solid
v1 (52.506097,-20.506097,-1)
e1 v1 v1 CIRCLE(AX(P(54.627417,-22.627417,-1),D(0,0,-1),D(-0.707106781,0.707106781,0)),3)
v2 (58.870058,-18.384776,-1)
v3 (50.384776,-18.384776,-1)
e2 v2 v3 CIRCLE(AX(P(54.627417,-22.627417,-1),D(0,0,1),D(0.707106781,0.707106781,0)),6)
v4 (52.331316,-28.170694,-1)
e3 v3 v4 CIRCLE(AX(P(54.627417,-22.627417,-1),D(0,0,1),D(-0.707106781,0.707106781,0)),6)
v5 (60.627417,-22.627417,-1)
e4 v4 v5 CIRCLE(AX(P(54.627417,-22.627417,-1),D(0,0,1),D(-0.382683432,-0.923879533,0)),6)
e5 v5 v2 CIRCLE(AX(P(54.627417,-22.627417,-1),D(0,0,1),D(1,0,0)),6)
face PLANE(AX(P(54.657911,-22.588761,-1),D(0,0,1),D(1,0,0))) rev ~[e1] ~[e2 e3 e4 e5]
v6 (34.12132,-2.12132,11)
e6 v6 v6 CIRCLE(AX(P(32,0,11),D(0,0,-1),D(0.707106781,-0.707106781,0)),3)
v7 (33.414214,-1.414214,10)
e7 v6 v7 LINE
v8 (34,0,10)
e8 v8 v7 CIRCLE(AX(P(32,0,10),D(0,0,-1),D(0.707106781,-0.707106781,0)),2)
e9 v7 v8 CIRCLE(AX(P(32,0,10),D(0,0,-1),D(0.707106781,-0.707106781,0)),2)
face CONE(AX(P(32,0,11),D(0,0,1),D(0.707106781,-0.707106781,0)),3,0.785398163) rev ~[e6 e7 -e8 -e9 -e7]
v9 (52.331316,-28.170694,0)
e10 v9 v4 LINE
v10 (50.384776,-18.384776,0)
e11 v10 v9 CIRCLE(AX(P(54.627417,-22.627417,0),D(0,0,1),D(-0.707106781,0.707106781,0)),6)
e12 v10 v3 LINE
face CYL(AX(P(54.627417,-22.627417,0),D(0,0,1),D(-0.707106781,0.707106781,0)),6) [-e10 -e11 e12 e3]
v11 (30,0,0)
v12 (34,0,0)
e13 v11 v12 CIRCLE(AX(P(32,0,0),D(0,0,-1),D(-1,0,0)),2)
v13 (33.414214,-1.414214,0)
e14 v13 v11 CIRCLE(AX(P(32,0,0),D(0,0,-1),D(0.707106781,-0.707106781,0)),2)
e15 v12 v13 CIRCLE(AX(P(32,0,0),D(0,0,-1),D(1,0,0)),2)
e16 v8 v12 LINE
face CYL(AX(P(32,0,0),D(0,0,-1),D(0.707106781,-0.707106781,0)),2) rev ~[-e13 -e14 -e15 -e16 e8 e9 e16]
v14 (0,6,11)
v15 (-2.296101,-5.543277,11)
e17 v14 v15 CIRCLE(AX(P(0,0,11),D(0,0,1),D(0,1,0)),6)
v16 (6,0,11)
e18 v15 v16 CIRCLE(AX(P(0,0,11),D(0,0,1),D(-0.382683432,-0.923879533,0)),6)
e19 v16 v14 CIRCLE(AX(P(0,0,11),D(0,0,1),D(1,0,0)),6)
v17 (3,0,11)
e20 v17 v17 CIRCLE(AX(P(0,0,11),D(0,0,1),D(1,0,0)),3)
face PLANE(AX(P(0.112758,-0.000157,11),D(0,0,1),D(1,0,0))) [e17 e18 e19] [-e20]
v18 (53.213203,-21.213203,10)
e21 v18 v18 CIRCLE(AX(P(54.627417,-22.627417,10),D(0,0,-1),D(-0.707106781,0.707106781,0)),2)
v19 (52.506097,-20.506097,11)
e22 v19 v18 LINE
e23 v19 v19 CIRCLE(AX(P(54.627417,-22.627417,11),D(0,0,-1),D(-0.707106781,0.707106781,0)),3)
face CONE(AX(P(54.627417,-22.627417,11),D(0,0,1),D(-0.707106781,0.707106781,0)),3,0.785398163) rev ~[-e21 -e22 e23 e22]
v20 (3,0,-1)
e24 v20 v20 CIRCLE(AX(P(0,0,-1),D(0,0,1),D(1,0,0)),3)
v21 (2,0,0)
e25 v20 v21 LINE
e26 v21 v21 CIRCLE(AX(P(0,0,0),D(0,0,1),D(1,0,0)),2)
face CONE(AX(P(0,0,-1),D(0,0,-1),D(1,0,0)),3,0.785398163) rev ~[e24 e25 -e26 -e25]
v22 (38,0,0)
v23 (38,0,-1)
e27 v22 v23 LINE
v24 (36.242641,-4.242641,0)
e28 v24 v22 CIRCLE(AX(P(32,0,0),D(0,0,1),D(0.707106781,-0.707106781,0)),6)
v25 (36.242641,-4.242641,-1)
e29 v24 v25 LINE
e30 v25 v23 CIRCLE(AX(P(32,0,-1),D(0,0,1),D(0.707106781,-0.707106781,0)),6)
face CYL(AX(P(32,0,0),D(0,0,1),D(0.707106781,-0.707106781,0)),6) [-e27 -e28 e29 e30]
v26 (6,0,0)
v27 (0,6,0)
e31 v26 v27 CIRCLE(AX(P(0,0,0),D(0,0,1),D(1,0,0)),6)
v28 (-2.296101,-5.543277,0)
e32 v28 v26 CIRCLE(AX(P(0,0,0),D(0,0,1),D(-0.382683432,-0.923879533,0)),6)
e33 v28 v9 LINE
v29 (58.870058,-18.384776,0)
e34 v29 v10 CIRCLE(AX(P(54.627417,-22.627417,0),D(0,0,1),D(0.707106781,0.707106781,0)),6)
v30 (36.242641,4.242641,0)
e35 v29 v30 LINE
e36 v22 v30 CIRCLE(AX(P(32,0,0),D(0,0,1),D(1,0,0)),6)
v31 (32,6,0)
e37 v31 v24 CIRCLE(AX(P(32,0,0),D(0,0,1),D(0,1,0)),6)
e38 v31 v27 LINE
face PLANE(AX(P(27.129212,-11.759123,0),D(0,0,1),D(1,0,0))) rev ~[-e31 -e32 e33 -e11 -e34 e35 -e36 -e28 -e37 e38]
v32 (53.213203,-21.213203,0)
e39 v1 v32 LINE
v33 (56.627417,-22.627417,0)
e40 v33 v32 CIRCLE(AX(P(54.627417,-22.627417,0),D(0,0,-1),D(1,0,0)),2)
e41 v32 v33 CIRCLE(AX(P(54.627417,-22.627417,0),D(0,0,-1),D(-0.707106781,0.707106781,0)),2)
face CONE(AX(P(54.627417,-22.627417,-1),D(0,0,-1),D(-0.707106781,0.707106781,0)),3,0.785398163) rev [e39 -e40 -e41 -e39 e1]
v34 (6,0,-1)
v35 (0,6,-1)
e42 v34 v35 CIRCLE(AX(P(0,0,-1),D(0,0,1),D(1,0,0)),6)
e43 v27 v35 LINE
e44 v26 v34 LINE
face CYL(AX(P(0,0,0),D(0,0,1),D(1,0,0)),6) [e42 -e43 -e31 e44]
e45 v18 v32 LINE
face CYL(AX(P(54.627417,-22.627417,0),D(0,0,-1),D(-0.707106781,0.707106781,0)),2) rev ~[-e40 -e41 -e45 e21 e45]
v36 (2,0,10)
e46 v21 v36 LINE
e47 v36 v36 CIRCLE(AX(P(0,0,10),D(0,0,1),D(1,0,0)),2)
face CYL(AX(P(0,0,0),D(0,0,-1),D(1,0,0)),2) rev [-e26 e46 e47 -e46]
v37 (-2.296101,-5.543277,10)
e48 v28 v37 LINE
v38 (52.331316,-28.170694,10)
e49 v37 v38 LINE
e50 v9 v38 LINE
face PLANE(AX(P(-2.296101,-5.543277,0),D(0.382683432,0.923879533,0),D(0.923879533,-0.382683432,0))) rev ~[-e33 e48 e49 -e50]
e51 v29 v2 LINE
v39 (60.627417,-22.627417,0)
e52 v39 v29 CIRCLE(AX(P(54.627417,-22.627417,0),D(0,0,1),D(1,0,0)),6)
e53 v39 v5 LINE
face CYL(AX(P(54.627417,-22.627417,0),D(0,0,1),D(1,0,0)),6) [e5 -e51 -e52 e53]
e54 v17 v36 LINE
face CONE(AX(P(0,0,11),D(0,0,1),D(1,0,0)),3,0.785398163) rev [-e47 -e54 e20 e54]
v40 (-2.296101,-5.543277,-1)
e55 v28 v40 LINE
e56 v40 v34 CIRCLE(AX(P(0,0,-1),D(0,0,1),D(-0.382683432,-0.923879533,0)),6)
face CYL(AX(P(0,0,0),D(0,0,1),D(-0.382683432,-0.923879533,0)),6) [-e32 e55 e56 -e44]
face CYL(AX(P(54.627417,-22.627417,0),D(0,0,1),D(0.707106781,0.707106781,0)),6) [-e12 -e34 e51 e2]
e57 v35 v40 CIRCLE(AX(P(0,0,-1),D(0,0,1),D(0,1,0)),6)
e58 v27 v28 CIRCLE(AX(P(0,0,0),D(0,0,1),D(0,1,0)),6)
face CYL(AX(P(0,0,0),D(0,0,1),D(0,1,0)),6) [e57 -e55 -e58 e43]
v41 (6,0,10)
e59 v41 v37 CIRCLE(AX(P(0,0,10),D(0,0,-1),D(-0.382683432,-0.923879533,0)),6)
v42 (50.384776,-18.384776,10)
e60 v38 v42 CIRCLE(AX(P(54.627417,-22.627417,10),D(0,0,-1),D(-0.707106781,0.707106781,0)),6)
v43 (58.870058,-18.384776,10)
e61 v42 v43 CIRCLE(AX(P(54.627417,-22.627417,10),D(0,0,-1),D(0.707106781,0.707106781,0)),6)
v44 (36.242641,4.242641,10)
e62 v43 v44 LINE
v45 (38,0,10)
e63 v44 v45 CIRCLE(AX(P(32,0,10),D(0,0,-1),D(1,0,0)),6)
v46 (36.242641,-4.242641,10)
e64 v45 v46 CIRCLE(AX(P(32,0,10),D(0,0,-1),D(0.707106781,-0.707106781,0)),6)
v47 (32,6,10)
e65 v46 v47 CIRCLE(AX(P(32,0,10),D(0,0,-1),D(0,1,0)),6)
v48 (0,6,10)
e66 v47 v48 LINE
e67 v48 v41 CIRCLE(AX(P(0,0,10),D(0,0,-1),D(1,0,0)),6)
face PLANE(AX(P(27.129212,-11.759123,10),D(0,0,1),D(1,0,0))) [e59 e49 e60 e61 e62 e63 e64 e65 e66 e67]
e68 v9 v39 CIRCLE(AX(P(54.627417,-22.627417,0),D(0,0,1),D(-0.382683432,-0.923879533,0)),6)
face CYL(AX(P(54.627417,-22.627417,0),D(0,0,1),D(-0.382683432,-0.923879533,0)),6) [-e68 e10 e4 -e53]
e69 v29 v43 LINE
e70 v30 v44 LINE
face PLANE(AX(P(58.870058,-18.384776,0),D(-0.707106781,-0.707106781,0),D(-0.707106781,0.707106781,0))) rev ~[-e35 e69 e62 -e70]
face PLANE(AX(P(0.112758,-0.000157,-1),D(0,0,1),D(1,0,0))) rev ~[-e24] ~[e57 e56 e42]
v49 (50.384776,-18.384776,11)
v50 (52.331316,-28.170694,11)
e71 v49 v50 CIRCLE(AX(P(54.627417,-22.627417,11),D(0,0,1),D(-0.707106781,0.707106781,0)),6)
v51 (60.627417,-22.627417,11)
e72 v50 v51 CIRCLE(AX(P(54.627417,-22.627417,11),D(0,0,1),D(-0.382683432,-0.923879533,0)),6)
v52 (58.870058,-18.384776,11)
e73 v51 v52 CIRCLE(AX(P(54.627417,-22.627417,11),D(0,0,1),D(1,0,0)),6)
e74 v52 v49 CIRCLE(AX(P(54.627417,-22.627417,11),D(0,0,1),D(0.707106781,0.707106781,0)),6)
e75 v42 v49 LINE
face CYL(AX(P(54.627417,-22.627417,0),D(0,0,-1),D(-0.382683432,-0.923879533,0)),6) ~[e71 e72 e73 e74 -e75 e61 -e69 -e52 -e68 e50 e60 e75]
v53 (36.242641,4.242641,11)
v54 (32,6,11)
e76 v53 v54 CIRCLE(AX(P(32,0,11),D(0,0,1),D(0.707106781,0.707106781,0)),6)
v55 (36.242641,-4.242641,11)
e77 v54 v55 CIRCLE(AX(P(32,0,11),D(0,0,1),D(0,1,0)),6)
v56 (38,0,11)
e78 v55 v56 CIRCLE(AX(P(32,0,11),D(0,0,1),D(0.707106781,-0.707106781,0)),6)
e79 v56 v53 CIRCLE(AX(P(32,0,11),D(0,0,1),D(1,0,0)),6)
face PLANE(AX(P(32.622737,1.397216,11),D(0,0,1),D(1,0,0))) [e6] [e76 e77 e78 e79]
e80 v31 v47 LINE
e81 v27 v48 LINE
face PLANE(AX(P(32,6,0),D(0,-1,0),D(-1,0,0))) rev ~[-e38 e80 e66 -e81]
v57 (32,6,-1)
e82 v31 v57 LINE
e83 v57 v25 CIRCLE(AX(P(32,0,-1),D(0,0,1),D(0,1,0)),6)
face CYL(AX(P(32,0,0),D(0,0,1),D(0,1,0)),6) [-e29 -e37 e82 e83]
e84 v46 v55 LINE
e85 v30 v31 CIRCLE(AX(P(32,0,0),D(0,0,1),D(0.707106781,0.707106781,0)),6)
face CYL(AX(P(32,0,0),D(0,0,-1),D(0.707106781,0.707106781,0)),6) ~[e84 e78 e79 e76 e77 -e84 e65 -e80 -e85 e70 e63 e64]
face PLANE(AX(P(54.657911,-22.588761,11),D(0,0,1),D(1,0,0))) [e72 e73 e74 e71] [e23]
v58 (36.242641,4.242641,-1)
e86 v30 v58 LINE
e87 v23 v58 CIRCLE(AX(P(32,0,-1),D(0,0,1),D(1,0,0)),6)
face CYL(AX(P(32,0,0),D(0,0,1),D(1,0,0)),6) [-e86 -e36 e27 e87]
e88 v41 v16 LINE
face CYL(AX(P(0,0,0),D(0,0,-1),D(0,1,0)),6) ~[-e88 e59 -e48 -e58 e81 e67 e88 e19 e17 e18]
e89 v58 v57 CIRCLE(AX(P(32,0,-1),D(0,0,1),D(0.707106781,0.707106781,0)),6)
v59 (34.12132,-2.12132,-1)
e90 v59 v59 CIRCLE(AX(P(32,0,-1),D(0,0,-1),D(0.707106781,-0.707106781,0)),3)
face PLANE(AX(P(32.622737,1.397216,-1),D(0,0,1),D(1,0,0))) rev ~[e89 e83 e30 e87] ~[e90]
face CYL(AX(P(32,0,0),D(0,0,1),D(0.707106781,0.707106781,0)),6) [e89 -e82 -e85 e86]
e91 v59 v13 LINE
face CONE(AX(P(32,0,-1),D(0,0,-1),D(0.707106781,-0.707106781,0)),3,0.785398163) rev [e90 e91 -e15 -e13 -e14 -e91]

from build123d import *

# Parameters (mm, degrees)
F0_R     = 2
F1_DEPTH = 10
F2_DEPTH = 11
F3_DEPTH = 1


# Not quite as in the source:
# - a fillet or chamfer that OpenCascade refuses, or shapes differently, is made with other operations: its cross-section is extruded or revolved along the edge and cut away or added
# - after a boolean that leaves OpenCascade's solid faulty, fix() repairs it


with BuildPart() as f1:
    # F0 (on Top) → F1 (new body)
    with BuildSketch(Plane.XY):
        with BuildLine():
            Line((26, 0), (6, 0))
            ThreePointArc((6, 0), (3.3334213981, -4.9888176738), (-2.2961005942, -5.5432771951))
            Line((-2.2961005942, -5.5432771951), (52.3313164038, -28.170694193))
            ThreePointArc((52.3313164038, -28.170694193), (48.7427053156, -23.7979589301), (50.3847763109, -18.3847763109))
            Line((50.3847763109, -18.3847763109), (36.2426406871, -4.2426406871))
            ThreePointArc((36.2426406871, -4.2426406871), (29.7038994058, -5.5432771951), (26, 0))
        make_face()
        with BuildLine():
            ThreePointArc((0, 6), (4.2426406871, 4.2426406871), (6, 0))
            Line((6, 0), (26, 0))
            ThreePointArc((26, 0), (27.7573593129, 4.2426406871), (32, 6))
            Line((32, 6), (0, 6))
        make_face()
        with BuildLine():
            ThreePointArc((38, 0), (37.5432771951, -2.2961005942), (36.2426406871, -4.2426406871))
            Line((36.2426406871, -4.2426406871), (50.3847763109, -18.3847763109))
            ThreePointArc((50.3847763109, -18.3847763109), (54.627416998, -16.627416998), (58.8700576851, -18.3847763109))
            Line((58.8700576851, -18.3847763109), (36.2426406871, 4.2426406871))
            ThreePointArc((36.2426406871, 4.2426406871), (37.5432771951, 2.2961005942), (38, 0))
        make_face()
        with BuildLine():
            ThreePointArc((-2.2961005942, -5.5432771951), (3.3334213981, -4.9888176738), (6, 0))
            ThreePointArc((6, 0), (4.2426406871, 4.2426406871), (0, 6))
            ThreePointArc((0, 6), (-5.8847116824, 1.1705419321), (-2.2961005942, -5.5432771951))
        make_face()
        Circle(F0_R, mode=Mode.SUBTRACT)
        with BuildLine():
            Line((30, 0), (26, 0))
            ThreePointArc((26, 0), (29.7038994058, -5.5432771951), (36.2426406871, -4.2426406871))
            Line((36.2426406871, -4.2426406871), (33.4142135624, -1.4142135624))
            ThreePointArc((33.4142135624, -1.4142135624), (31.2346331353, -1.847759065), (30, 0))
        make_face()
        with BuildLine():
            ThreePointArc((32, 6), (27.7573593129, 4.2426406871), (26, 0))
            Line((26, 0), (30, 0))
            ThreePointArc((30, 0), (32, 2), (34, 0))
            ThreePointArc((34, 0), (33.847759065, -0.7653668647), (33.4142135624, -1.4142135624))
            Line((33.4142135624, -1.4142135624), (36.2426406871, -4.2426406871))
            ThreePointArc((36.2426406871, -4.2426406871), (37.5432771951, -2.2961005942), (38, 0))
            ThreePointArc((38, 0), (37.5432771951, 2.2961005942), (36.2426406871, 4.2426406871))
            ThreePointArc((36.2426406871, 4.2426406871), (34.2961005942, 5.5432771951), (32, 6))
        make_face()
        with BuildLine():
            ThreePointArc((50.3847763109, -18.3847763109), (48.7427053156, -23.7979589301), (52.3313164038, -28.170694193))
            ThreePointArc((52.3313164038, -28.170694193), (57.9608383961, -27.6162346718), (60.627416998, -22.627416998))
            ThreePointArc((60.627416998, -22.627416998), (60.170694193, -20.3313164038), (58.8700576851, -18.3847763109))
            ThreePointArc((58.8700576851, -18.3847763109), (54.627416998, -16.627416998), (50.3847763109, -18.3847763109))
        make_face()
        with BuildLine():
            ThreePointArc((56.627416998, -22.627416998), (53.8620501332, -24.475176063), (53.2132034356, -21.2132034356))
            ThreePointArc((53.2132034356, -21.2132034356), (55.3927838627, -20.7796579329), (56.627416998, -22.627416998))
        make_face(mode=Mode.SUBTRACT)
    extrude(amount=F1_DEPTH)

    # F0 (on Top) → F2 (join)
    with BuildSketch(Plane.XY):
        with BuildLine():
            ThreePointArc((-2.2961005942, -5.5432771951), (3.3334213981, -4.9888176738), (6, 0))
            ThreePointArc((6, 0), (4.2426406871, 4.2426406871), (0, 6))
            ThreePointArc((0, 6), (-5.8847116824, 1.1705419321), (-2.2961005942, -5.5432771951))
        make_face()
        Circle(F0_R, mode=Mode.SUBTRACT)
        with BuildLine():
            ThreePointArc((32, 6), (27.7573593129, 4.2426406871), (26, 0))
            Line((26, 0), (30, 0))
            ThreePointArc((30, 0), (32, 2), (34, 0))
            ThreePointArc((34, 0), (33.847759065, -0.7653668647), (33.4142135624, -1.4142135624))
            Line((33.4142135624, -1.4142135624), (36.2426406871, -4.2426406871))
            ThreePointArc((36.2426406871, -4.2426406871), (37.5432771951, -2.2961005942), (38, 0))
            ThreePointArc((38, 0), (37.5432771951, 2.2961005942), (36.2426406871, 4.2426406871))
            ThreePointArc((36.2426406871, 4.2426406871), (34.2961005942, 5.5432771951), (32, 6))
        make_face()
        with BuildLine():
            Line((30, 0), (26, 0))
            ThreePointArc((26, 0), (29.7038994058, -5.5432771951), (36.2426406871, -4.2426406871))
            Line((36.2426406871, -4.2426406871), (33.4142135624, -1.4142135624))
            ThreePointArc((33.4142135624, -1.4142135624), (31.2346331353, -1.847759065), (30, 0))
        make_face()
        with BuildLine():
            ThreePointArc((50.3847763109, -18.3847763109), (48.7427053156, -23.7979589301), (52.3313164038, -28.170694193))
            ThreePointArc((52.3313164038, -28.170694193), (57.9608383961, -27.6162346718), (60.627416998, -22.627416998))
            ThreePointArc((60.627416998, -22.627416998), (60.170694193, -20.3313164038), (58.8700576851, -18.3847763109))
            ThreePointArc((58.8700576851, -18.3847763109), (54.627416998, -16.627416998), (50.3847763109, -18.3847763109))
        make_face()
        with BuildLine():
            ThreePointArc((56.627416998, -22.627416998), (53.8620501332, -24.475176063), (53.2132034356, -21.2132034356))
            ThreePointArc((53.2132034356, -21.2132034356), (55.3927838627, -20.7796579329), (56.627416998, -22.627416998))
        make_face(mode=Mode.SUBTRACT)
    extrude(amount=F2_DEPTH)

    # F0 (on Top) → F3 (join)
    with BuildSketch(Plane.XY):
        with BuildLine():
            ThreePointArc((-2.2961005942, -5.5432771951), (3.3334213981, -4.9888176738), (6, 0))
            ThreePointArc((6, 0), (4.2426406871, 4.2426406871), (0, 6))
            ThreePointArc((0, 6), (-5.8847116824, 1.1705419321), (-2.2961005942, -5.5432771951))
        make_face()
        Circle(F0_R, mode=Mode.SUBTRACT)
        with BuildLine():
            ThreePointArc((32, 6), (27.7573593129, 4.2426406871), (26, 0))
            Line((26, 0), (30, 0))
            ThreePointArc((30, 0), (32, 2), (34, 0))
            ThreePointArc((34, 0), (33.847759065, -0.7653668647), (33.4142135624, -1.4142135624))
            Line((33.4142135624, -1.4142135624), (36.2426406871, -4.2426406871))
            ThreePointArc((36.2426406871, -4.2426406871), (37.5432771951, -2.2961005942), (38, 0))
            ThreePointArc((38, 0), (37.5432771951, 2.2961005942), (36.2426406871, 4.2426406871))
            ThreePointArc((36.2426406871, 4.2426406871), (34.2961005942, 5.5432771951), (32, 6))
        make_face()
        with BuildLine():
            Line((30, 0), (26, 0))
            ThreePointArc((26, 0), (29.7038994058, -5.5432771951), (36.2426406871, -4.2426406871))
            Line((36.2426406871, -4.2426406871), (33.4142135624, -1.4142135624))
            ThreePointArc((33.4142135624, -1.4142135624), (31.2346331353, -1.847759065), (30, 0))
        make_face()
        with BuildLine():
            ThreePointArc((50.3847763109, -18.3847763109), (48.7427053156, -23.7979589301), (52.3313164038, -28.170694193))
            ThreePointArc((52.3313164038, -28.170694193), (57.9608383961, -27.6162346718), (60.627416998, -22.627416998))
            ThreePointArc((60.627416998, -22.627416998), (60.170694193, -20.3313164038), (58.8700576851, -18.3847763109))
            ThreePointArc((58.8700576851, -18.3847763109), (54.627416998, -16.627416998), (50.3847763109, -18.3847763109))
        make_face()
        with BuildLine():
            ThreePointArc((56.627416998, -22.627416998), (53.8620501332, -24.475176063), (53.2132034356, -21.2132034356))
            ThreePointArc((53.2132034356, -21.2132034356), (55.3927838627, -20.7796579329), (56.627416998, -22.627416998))
        make_face(mode=Mode.SUBTRACT)
    extrude(amount=-F3_DEPTH)

    add(f1.part.fix(), mode=Mode.REPLACE)

    # F4: chamfer of 1 on 6 edges, made by hand

    # F4_s1 → F4_t2 (revolve, cut)
    with BuildSketch(Plane.XZ):
        Polygon((3, 11), (2, 10), (2, 11), align=None)
    revolve(axis=Axis((0, 0, 11), (0, 0, 1)), mode=Mode.SUBTRACT)

    # F4_s3 → F4_t4 (revolve, cut)
    with BuildSketch(Plane(origin=(16, 16, 0), x_dir=(0, 0, 1), z_dir=(0.7071067812, 0.7071067812, 0))):
        Polygon((11, 25.627416998), (10, 24.627416998), (11, 24.627416998), align=None)
    revolve(axis=Axis((32, 0, 11), (0, 0, -1)), mode=Mode.SUBTRACT)

    # F4_s5 → F4_t6 (revolve, cut)
    with BuildSketch(Plane(origin=(16, 16, 0), x_dir=(0, 0, 1), z_dir=(-0.7071067812, -0.7071067812, 0))):
        Polygon((11, -51.627416998), (10, -52.627416998), (11, -52.627416998), align=None)
    revolve(axis=Axis((54.627416998, -22.627416998, 11), (0, 0, -1)), mode=Mode.SUBTRACT)

    # F4_s7 → F4_t8 (revolve, cut)
    with BuildSketch(Plane.XZ):
        Polygon((3, -1), (2, 0), (2, -1), align=None)
    revolve(axis=Axis((0, 0, -1), (0, 0, 1)), mode=Mode.SUBTRACT)

    # F4_s9 → F4_t10 (revolve, cut)
    with BuildSketch(Plane(origin=(16, 16, 0), x_dir=(0, 0, 1), z_dir=(0.7071067812, 0.7071067812, 0))):
        Polygon((-1, 25.627416998), (0, 24.627416998), (-1, 24.627416998), align=None)
    revolve(axis=Axis((32, 0, -1), (0, 0, -1)), mode=Mode.SUBTRACT)

    # F4_s11 → F4_t12 (revolve, cut)
    with BuildSketch(Plane(origin=(16, 16, 0), x_dir=(0, 0, 1), z_dir=(-0.7071067812, -0.7071067812, 0))):
        Polygon((-1, -51.627416998), (0, -52.627416998), (-1, -52.627416998), align=None)
    revolve(axis=Axis((54.627416998, -22.627416998, -1), (0, 0, -1)), mode=Mode.SUBTRACT)


solid = f1.part
